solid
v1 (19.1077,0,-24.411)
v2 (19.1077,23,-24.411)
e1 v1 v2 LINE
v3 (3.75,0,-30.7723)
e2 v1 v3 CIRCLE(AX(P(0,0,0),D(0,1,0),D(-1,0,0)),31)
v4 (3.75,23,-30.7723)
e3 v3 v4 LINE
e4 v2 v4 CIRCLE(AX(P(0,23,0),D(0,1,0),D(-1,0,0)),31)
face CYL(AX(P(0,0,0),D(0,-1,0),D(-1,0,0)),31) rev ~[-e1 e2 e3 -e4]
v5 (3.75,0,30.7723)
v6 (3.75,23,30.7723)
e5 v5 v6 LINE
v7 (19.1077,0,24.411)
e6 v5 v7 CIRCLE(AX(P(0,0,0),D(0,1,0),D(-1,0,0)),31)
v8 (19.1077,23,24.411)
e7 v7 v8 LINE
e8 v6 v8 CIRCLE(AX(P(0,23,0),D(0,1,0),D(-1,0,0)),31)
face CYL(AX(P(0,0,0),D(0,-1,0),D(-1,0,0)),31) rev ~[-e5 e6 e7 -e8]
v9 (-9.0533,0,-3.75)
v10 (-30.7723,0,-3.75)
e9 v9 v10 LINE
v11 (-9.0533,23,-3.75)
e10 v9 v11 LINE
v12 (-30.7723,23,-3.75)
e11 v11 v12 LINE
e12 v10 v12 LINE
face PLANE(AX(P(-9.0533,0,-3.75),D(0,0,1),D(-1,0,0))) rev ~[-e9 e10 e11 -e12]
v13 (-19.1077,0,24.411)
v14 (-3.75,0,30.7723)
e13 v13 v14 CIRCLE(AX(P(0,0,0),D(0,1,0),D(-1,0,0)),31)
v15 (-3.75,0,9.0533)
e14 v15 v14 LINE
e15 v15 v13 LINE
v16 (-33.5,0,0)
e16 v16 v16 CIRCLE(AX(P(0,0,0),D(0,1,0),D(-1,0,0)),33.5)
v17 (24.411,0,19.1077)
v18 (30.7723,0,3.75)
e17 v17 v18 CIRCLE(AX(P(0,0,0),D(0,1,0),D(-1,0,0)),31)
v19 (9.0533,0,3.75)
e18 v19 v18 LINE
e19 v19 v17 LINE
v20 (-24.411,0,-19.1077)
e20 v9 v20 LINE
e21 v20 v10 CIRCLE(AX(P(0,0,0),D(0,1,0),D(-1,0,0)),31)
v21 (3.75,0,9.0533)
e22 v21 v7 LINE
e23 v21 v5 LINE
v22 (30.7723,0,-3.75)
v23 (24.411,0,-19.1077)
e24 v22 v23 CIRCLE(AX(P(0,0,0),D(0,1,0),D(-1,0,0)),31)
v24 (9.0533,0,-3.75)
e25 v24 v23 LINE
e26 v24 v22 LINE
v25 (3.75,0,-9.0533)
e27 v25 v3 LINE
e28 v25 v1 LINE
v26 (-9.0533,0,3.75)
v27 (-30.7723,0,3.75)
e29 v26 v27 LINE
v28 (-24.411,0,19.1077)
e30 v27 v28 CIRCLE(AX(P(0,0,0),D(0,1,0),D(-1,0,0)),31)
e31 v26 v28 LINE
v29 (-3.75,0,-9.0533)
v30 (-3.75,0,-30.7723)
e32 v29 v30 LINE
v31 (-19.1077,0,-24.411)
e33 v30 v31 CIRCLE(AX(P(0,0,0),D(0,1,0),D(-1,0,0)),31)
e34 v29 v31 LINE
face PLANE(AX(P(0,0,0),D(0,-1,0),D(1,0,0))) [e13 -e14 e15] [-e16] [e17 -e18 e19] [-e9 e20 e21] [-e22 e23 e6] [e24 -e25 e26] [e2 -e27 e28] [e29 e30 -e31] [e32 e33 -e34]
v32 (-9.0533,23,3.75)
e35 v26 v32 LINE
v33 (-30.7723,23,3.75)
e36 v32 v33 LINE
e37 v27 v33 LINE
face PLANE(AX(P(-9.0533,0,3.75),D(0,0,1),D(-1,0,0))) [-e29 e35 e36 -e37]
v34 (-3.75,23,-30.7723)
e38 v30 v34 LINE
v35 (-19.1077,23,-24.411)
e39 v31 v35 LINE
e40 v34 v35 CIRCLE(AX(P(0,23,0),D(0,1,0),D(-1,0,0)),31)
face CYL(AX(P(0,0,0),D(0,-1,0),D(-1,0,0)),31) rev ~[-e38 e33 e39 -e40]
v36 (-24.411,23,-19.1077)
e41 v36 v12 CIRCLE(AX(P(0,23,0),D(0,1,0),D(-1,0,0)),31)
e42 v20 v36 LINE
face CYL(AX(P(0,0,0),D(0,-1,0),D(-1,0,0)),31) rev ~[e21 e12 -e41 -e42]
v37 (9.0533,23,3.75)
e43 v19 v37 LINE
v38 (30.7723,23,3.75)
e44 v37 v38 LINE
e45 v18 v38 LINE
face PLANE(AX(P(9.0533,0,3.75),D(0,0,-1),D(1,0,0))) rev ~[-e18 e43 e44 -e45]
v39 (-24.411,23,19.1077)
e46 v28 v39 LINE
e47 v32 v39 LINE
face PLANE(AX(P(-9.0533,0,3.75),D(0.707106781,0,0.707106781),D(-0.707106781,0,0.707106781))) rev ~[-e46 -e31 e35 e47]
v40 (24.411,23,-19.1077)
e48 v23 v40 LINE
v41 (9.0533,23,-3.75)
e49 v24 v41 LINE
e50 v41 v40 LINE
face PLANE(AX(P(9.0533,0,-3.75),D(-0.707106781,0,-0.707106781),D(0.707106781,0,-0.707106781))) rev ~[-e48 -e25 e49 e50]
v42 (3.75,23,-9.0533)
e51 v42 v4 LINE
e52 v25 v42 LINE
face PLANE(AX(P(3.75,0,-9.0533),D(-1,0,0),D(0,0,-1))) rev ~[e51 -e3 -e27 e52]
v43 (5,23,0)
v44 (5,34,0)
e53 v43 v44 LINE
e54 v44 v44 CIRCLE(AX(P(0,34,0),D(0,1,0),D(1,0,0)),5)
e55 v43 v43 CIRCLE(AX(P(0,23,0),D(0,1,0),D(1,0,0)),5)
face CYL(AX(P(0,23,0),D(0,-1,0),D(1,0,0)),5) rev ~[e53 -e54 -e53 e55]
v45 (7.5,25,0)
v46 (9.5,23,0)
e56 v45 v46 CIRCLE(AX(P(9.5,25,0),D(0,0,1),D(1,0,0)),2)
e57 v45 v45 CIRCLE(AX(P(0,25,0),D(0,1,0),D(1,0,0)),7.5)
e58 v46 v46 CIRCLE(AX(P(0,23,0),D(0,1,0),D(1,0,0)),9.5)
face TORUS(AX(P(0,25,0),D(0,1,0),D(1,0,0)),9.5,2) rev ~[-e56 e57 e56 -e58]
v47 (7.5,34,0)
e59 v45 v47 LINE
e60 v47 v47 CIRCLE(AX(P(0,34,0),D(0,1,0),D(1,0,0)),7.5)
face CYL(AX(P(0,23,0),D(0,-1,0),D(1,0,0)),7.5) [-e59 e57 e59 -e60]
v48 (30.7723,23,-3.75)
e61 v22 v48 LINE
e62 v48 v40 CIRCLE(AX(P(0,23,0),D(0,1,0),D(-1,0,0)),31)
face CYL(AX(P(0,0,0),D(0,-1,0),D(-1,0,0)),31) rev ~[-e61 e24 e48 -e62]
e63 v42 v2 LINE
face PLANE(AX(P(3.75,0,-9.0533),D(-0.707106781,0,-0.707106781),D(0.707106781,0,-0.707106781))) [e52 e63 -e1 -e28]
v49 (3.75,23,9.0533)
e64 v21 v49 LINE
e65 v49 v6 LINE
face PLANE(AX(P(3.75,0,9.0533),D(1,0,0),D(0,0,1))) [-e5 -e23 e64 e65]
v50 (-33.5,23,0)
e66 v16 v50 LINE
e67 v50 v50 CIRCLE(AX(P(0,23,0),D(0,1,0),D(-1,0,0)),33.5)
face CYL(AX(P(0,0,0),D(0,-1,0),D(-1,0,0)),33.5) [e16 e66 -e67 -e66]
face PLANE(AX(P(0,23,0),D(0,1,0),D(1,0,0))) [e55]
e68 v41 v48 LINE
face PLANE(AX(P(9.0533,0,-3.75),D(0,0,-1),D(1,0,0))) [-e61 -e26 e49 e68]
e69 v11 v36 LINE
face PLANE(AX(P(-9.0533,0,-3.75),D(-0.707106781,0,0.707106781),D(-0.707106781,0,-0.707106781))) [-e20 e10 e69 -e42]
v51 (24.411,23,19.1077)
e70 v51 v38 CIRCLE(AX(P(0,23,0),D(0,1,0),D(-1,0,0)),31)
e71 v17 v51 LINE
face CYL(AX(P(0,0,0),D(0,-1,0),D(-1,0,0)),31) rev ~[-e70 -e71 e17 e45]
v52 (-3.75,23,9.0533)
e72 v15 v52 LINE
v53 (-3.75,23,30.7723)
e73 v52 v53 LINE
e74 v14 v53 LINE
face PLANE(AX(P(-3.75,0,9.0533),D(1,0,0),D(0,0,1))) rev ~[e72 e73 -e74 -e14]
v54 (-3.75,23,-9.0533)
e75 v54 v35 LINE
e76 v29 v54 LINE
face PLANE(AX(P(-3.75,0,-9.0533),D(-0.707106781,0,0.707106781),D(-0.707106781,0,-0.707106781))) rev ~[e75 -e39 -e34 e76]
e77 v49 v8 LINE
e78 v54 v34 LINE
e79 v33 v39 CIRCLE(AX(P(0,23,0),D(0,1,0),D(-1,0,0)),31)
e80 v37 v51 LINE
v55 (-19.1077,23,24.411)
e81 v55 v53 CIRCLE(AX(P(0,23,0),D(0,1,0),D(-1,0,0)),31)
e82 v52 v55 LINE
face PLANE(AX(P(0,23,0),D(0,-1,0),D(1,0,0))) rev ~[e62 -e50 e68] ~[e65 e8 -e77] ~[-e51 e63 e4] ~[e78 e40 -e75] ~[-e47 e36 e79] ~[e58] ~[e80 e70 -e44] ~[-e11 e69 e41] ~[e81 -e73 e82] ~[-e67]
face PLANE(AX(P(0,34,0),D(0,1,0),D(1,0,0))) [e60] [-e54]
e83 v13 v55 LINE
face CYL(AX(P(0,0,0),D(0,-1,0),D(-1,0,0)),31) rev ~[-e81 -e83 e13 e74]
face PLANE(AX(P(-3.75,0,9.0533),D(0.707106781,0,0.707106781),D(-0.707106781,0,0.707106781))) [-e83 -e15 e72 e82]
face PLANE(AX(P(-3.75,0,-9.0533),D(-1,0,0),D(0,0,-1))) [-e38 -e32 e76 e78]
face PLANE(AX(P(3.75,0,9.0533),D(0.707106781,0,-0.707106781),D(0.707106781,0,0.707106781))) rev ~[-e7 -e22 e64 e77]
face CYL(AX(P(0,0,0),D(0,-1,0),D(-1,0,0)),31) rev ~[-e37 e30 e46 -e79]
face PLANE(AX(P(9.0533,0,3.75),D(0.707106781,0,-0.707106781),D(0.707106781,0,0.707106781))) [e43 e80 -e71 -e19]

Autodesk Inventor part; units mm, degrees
ref_plane "YZ Plane" through (0, 0, 0) normal (1, 0, 0) x (0, 1, 0)
ref_plane "XZ Plane" through (0, 0, 0) normal (0, 1, 0) x (-1, 0, 0)
ref_plane "XY Plane" through (0, 0, 0) normal (0, 0, 1) x (1, 0, 0)
sketch "Sketch1" plane through (0, 0, 0) normal (0, 1, 0) x (-1, 0, 0)
  circle A0 centre (0, 0) radius 31
  circle A1 centre (0, 0) radius 33.5
  dimension "d0" = 62
  dimension "d1" = 67
extrude "Extrusion1" add sketch "Sketch1" along normal blind 23
sketch "Sketch3" plane through (0, 23, 0) normal (0, 1, 0) x (1, 0, 0)
  circle A0 centre (0, 0) radius 31
hole "Hole1" at (0, 23, 0) direction (0, -1, 0) diameter 62 end through all
sketch "Sketch4" plane through (0, 23, 0) normal (0, 1, 0) x (1, 0, 0)
  circle A0 centre (0, 0) radius 9.4443
hole "Hole2" at (0, 23, 0) direction (0, -1, 0) diameter 62 end through all
sketch "Sketch5" plane through (0, 0, 0) normal (0, -1, 0) x (1, 0, 0)
  circle A0 centre (0, 0) radius 5
  line L0 (-5, 2.5) -> (-30.9738, 2.5)
  line L1 (-5, -2.5) -> (-30.9738, -2.5)
  line L2 (-4.3301, 2.5) -> (-5, 2.5)
  line L3 (-5, -2.5) -> (-4.3301, -2.5)
  dimension "d46" = 10
extrude "Extrusion3" add sketch "Sketch5" against normal blind 23
sketch "Sketch6" plane through (0, 23, 0) normal (0, 1, 0) x (1, 0, 0)
  circle A0 centre (0, 0) radius 7.5
  dimension "d49" = 15
extrude "Extrusion4" add sketch "Sketch6" against normal blind 23
sketch "Sketch7" plane through (0, 23, 0) normal (0, 1, 0) x (1, 0, 0)
  circle A0 centre (0, 0) radius 5
  circle A1 centre (0, 0) radius 31 projected
  circle A2 centre (0, 0) radius 7.5
  dimension "d52" = 10
extrude "Extrusion5" add sketch "Sketch7" along normal blind 11 contours A2
sketch "Sketch8" plane through (0, 0, 0) normal (0, -1, 0) x (1, 0, 0)
  circle A0 centre (0, 0) radius 7.5 projected
  line L0 (-6.4952, 3.75) -> (-30.7723, 3.75)
  circle A1 centre (0, 0) radius 31 projected
  line L1 (-6.4952, -3.75) -> (-30.7723, -3.75)
  line L2 (-1.9411, -7.2444) -> (-19.1077, -24.411)
  line L3 (-7.2444, -1.9411) -> (-24.411, -19.1077)
  line L4 (3.75, -6.4952) -> (3.75, -30.7723)
  line L5 (-3.75, -6.4952) -> (-3.75, -30.7723)
  line L6 (7.2444, -1.9411) -> (24.411, -19.1077)
  line L7 (1.9411, -7.2444) -> (19.1077, -24.411)
  line L8 (6.4952, 3.75) -> (30.7723, 3.75)
  line L9 (6.4952, -3.75) -> (30.7723, -3.75)
  line L10 (1.9411, 7.2444) -> (19.1077, 24.411)
  line L11 (7.2444, 1.9411) -> (24.411, 19.1077)
  line L12 (-3.75, 6.4952) -> (-3.75, 30.7723)
  line L13 (3.75, 6.4952) -> (3.75, 30.7723)
  line L14 (-7.2444, 1.9411) -> (-24.411, 19.1077)
  line L15 (-1.9411, 7.2444) -> (-19.1077, 24.411)
  point P0 (-9.0533, -3.75)
  point P1 (-3.75, -9.0533)
  point P2 (3.75, -9.0533)
  point P3 (9.0533, -3.75)
  point P4 (9.0533, 3.75)
  point P5 (3.75, 9.0533)
  point P6 (-3.75, 9.0533)
  point P7 (-9.0533, 3.75)
  dimension "d57" = 360
extrude "Extrusion6" add sketch "Sketch8" against normal blind 23 contours A0 L11 L8 A1 L9 L6 | A0 L8 L11 | L6 L9 A0 | A0 L13 L10 A1 L11 L8 | L9 L6 A1 L7 L4 A0 | A0 L10 L13 | L4 L7 A0 | A0 L15 L12 A1 L13 L10 | L7 L4 A1 L5 L2 A0 | A0 L12 L15 | L2 L5 A0 | A0 L0 L14 A1 L15 L12 | L5 L2 A1 L3 L1 A0 | A0 L14 L0 | L1 L3 A0 | A0 L3 L1 A1 L0 L14
sketch "Sketch9" plane through (0, 23, 0) normal (0, 1, 0) x (1, 0, 0)
  circle A0 centre (0, 0) radius 7.5 projected
  circle A1 centre (0, 0) radius 7.5 projected
  circle A2 centre (0, 0) radius 7.5
  circle A3 centre (0, 0) radius 30.9985
  point P0 (-30.7723, 3.75)
  point P1 (-30.7723, -3.75)
fillet "Fillet2" radius 2 1 edges at (-7.5, 23, 0)
properties part number "rueda de motol"
